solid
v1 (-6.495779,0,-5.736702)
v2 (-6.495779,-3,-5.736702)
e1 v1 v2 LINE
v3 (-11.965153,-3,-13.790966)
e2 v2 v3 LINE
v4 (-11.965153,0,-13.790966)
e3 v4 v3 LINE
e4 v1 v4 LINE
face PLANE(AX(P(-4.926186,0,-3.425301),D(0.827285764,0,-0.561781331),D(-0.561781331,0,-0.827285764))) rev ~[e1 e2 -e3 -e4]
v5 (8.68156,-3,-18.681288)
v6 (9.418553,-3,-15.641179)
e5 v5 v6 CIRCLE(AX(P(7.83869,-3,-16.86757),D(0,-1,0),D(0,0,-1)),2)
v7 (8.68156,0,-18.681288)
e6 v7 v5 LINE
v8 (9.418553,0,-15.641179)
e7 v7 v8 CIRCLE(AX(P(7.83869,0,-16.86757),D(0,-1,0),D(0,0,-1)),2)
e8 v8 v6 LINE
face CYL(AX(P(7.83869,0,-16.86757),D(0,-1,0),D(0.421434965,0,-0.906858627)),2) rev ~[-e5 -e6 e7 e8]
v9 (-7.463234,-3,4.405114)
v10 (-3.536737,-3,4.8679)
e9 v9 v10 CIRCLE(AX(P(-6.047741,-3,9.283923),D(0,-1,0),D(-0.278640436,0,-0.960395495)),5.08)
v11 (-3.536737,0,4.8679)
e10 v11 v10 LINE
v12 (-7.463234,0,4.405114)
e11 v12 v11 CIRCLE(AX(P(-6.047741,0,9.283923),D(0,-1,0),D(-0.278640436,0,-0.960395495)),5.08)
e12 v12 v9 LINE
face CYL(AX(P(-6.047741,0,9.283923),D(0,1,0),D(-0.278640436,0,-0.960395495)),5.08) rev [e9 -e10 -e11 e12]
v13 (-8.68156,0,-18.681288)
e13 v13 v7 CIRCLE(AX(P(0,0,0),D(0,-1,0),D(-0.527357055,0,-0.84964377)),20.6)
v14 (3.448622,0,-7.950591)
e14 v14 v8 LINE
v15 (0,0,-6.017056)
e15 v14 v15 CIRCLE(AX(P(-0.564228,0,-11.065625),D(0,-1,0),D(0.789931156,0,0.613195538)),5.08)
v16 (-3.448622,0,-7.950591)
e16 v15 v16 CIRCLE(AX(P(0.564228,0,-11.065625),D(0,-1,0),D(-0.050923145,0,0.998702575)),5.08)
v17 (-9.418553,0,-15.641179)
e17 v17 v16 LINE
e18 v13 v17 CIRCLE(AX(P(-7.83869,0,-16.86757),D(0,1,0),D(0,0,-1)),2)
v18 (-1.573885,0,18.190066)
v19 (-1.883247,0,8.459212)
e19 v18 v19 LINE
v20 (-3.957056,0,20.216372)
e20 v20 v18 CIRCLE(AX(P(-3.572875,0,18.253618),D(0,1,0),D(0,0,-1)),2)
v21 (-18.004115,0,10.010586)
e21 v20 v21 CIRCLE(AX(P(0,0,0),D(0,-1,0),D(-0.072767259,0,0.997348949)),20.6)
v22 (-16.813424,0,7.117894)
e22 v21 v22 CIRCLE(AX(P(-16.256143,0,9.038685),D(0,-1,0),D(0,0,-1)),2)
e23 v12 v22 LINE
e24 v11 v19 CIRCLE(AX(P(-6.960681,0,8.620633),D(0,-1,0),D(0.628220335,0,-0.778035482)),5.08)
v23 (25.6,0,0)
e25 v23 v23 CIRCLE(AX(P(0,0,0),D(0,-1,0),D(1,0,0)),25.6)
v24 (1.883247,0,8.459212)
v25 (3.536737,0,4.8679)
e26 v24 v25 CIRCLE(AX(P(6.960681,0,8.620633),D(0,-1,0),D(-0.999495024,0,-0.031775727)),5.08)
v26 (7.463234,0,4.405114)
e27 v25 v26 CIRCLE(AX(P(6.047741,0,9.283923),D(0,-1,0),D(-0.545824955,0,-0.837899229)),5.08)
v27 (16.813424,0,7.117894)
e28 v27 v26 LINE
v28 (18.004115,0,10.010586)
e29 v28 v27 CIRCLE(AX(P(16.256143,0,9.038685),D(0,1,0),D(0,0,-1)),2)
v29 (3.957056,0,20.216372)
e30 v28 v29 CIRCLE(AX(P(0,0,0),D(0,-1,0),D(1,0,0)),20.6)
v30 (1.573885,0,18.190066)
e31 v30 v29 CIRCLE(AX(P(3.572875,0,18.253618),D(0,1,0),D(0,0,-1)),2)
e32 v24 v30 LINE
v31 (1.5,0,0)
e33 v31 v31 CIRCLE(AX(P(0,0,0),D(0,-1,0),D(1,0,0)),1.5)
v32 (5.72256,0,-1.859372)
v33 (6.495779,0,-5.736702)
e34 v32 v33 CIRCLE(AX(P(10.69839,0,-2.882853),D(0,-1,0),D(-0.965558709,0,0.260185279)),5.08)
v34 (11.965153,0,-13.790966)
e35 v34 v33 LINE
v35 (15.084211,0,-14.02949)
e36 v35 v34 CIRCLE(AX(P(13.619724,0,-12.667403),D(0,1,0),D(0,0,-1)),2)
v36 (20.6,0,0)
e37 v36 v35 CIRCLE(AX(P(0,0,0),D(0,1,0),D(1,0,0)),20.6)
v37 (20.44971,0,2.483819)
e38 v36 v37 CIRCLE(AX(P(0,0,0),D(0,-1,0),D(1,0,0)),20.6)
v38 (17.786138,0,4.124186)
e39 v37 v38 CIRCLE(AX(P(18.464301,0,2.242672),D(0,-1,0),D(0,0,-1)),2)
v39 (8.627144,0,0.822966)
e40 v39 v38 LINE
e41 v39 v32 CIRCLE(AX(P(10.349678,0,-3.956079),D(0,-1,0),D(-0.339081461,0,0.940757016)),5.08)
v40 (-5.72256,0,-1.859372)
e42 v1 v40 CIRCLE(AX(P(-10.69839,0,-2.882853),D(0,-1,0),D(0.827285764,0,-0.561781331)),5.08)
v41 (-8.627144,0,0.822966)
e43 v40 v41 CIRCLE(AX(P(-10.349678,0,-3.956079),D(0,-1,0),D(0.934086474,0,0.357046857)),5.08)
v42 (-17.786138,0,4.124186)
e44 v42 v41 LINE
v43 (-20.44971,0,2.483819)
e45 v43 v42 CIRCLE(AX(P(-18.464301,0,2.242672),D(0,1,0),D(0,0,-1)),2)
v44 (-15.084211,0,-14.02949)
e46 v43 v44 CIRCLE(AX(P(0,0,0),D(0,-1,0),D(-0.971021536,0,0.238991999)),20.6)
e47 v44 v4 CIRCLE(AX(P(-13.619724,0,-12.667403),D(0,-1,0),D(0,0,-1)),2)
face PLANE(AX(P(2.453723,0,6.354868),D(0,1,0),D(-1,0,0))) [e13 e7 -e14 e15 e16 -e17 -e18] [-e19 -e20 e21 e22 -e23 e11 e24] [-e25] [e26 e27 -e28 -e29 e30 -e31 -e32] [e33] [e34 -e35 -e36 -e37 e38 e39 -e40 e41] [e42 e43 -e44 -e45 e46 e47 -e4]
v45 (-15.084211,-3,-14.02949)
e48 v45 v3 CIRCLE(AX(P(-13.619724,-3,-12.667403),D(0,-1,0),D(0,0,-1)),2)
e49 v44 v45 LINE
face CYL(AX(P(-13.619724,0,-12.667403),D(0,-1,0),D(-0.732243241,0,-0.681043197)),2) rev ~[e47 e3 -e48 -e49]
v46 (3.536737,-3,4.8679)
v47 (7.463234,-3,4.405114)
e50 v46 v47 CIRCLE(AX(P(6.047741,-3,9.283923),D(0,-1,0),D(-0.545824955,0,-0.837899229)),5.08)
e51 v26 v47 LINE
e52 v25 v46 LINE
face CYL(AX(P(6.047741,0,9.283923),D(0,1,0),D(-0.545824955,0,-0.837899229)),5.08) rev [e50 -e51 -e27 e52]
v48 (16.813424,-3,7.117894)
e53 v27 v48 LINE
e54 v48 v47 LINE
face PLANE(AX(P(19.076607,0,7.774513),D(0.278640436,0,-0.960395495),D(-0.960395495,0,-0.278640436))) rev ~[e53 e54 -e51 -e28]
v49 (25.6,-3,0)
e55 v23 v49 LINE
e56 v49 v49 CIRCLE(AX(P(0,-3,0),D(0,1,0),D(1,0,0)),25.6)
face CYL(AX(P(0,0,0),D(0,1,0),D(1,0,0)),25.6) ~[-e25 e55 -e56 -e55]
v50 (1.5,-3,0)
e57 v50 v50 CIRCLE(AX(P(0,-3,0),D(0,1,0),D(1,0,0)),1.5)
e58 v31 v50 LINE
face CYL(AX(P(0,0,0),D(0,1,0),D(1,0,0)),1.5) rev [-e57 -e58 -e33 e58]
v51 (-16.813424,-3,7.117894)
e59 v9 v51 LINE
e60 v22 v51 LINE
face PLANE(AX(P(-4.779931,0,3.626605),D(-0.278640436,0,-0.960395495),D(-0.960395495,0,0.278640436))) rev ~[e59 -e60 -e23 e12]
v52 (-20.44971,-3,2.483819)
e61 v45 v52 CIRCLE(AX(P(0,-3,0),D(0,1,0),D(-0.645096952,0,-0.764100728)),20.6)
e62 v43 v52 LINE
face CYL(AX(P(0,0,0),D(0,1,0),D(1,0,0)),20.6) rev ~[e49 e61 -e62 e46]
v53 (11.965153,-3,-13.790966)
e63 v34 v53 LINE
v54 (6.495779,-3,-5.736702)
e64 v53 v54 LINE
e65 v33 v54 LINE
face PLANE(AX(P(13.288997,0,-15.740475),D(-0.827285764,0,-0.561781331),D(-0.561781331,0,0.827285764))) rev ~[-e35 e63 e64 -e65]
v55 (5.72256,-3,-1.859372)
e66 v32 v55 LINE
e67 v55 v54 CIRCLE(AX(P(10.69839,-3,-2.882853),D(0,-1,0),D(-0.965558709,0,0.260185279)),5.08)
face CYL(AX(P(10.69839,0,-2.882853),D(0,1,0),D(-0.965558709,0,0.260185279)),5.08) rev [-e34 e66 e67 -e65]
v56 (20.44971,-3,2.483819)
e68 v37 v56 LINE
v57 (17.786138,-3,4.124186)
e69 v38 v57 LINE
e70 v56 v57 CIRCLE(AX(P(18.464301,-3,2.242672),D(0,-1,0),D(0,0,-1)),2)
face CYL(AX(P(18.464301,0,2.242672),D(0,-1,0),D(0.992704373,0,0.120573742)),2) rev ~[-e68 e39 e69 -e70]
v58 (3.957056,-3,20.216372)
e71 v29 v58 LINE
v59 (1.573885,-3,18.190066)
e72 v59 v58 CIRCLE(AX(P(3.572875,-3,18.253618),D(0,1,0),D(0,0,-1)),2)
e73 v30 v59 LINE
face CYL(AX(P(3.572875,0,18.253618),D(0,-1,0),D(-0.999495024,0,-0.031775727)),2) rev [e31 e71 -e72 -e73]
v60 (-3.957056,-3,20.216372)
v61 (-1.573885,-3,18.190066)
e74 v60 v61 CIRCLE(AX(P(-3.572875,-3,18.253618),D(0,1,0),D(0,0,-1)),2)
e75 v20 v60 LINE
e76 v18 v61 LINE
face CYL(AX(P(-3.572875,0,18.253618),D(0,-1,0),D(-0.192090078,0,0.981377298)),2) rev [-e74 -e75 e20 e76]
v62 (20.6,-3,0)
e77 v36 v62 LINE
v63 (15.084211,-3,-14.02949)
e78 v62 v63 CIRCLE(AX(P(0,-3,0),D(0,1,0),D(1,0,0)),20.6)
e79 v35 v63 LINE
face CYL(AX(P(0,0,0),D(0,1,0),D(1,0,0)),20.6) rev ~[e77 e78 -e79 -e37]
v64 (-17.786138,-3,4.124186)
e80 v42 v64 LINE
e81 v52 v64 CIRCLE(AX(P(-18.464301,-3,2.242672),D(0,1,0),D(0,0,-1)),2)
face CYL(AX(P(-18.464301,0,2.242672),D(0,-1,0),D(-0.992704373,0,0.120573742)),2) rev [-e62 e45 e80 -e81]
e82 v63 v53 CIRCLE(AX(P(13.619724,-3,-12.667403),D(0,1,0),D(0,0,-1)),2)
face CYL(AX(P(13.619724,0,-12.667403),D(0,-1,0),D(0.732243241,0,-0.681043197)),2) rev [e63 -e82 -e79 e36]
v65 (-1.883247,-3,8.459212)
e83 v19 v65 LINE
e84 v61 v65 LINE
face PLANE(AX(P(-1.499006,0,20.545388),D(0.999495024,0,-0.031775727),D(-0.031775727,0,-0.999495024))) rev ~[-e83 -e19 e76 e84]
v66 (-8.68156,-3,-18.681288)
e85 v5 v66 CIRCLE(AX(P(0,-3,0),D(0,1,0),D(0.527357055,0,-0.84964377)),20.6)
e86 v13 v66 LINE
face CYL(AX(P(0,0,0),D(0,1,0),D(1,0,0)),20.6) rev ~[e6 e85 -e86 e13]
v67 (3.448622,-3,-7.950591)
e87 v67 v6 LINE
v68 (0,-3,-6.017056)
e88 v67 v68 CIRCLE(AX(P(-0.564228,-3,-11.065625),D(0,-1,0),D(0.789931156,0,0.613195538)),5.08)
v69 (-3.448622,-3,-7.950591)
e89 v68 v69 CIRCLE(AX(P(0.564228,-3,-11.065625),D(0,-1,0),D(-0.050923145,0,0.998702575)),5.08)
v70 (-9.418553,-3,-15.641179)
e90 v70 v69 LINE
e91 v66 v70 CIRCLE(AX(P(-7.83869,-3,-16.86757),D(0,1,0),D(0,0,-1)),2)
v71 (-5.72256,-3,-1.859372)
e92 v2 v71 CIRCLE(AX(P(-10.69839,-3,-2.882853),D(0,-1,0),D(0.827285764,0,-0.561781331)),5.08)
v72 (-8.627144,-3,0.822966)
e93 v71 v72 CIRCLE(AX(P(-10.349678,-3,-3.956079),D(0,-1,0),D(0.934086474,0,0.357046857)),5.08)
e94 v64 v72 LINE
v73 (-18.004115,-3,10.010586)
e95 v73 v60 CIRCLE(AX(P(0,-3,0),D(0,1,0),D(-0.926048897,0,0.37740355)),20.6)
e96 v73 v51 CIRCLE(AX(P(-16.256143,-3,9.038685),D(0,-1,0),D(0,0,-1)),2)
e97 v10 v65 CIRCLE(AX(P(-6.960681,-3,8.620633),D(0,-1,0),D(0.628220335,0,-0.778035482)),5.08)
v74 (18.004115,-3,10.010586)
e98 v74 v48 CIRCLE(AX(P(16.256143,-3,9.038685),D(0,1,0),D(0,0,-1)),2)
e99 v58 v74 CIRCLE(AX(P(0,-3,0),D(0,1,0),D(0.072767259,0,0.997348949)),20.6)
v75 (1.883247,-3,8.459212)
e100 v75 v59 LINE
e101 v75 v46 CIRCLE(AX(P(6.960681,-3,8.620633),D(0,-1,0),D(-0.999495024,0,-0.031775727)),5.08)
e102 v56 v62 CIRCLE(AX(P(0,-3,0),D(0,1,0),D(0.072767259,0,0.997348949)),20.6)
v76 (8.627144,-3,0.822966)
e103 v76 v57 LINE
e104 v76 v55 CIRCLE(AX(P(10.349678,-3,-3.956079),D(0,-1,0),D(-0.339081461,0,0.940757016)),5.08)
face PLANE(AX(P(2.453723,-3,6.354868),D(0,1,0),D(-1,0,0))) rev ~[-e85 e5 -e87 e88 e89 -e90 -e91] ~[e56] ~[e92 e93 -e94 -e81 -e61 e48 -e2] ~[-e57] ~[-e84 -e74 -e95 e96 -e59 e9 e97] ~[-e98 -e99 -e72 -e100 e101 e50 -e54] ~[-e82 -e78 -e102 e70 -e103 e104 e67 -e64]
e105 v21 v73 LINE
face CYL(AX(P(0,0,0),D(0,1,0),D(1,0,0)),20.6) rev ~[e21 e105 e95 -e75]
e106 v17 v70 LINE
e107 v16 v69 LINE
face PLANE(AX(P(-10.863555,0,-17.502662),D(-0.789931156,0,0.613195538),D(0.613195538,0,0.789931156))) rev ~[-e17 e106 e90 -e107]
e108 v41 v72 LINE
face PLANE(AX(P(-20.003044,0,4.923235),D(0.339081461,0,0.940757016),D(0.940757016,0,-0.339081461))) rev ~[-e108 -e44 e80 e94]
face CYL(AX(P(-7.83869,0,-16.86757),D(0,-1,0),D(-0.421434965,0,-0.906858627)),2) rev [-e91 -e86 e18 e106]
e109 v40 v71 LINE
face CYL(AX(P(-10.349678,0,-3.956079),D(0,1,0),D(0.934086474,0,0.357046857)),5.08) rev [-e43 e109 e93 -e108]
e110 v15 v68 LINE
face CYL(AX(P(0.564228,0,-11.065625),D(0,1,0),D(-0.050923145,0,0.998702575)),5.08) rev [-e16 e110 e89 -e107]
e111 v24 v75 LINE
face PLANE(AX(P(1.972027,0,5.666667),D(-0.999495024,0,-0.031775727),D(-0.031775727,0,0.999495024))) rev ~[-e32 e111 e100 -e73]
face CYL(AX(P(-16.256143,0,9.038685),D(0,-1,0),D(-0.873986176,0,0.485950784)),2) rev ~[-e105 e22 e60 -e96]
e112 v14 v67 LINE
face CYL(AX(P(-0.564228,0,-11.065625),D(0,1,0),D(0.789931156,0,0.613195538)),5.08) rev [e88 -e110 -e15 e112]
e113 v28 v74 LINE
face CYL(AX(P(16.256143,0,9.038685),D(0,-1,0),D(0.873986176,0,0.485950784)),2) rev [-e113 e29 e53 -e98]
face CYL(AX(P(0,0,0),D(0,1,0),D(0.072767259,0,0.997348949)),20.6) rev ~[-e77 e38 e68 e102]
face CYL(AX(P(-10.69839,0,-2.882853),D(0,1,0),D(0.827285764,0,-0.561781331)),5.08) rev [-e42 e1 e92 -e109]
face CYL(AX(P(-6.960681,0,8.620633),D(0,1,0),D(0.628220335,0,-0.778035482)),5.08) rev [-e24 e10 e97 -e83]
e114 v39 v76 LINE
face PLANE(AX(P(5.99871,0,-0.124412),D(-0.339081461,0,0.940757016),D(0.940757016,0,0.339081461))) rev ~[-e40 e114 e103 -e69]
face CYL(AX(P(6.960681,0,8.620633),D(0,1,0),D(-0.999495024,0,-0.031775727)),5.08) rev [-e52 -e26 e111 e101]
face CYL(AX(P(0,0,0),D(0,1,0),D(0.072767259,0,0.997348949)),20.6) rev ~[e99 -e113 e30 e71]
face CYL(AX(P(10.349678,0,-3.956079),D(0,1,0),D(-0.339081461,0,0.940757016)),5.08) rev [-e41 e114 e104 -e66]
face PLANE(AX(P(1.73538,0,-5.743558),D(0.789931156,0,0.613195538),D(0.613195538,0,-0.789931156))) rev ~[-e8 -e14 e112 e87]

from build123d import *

# Parameters (mm, degrees)
F0_R        = 25.6
F0_R_2      = 1.5
F1_DEPTH    = 3
F2_COUNT    = 5
F3_T1_DEPTH = 3
F4_R        = 2


# Not quite as in the source:
# - a fillet or chamfer that OpenCascade refuses, or shapes differently, is made with other operations: its cross-section is extruded or revolved along the edge and cut away or added


with BuildPart() as f1:
    # F0 (on Front) → F1 (new body)
    with BuildSketch(Plane.XZ):
        Circle(F0_R)
        with BuildLine():
            ThreePointArc((-1.4990055262, 20.5453883495), (0, 20.6), (1.4990055262, 20.5453883495))
            ThreePointArc((1.4990055262, 20.5453883495), (15.0870725099, 14.0264123382), (20.6, 0))
            ThreePointArc((20.6, 0), (-14.0264123382, -15.0870725099), (-1.4990055262, 20.5453883495))
        make_face(mode=Mode.SUBTRACT)
        with BuildLine():
            ThreePointArc((-1.9720265944, 5.6666666667), (-3.4761933515, -4.8904069139), (6, 0))
            ThreePointArc((6, 0), (4.8904069139, 3.4761933515), (1.9720265944, 5.6666666667))
            ThreePointArc((1.9720265944, 5.6666666667), (0, 6), (-1.9720265944, 5.6666666667))
        make_face()
        Circle(F0_R_2, mode=Mode.SUBTRACT)
        with BuildLine():
            ThreePointArc((-1.9720265944, 5.6666666667), (0, 6), (1.9720265944, 5.6666666667))
            Line((1.9720265944, 5.6666666667), (1.4990055262, 20.5453883495))
            ThreePointArc((1.4990055262, 20.5453883495), (0, 20.6), (-1.4990055262, 20.5453883495))
            Line((-1.4990055262, 20.5453883495), (-1.9720265944, 5.6666666667))
        make_face()
    extrude(amount=F1_DEPTH)

    # F2: F1 ×5 about axis
    f2_axis = Axis((0, 0, 0), (0, -1, 0))


with BuildPart() as f1_1:
    add(f1.part)
    for i in range(1, F2_COUNT):
        add(f1.part.rotate(f2_axis, i * 360 / F2_COUNT))

    # F3: fillet of radius 5.08 on 10 edges, made by hand

    # F3_s2 → F3_t1 (join)
    with BuildSketch(Plane.XZ):
        with BuildLine():
            ThreePointArc((1.8832465894, 8.4592124416), (2.4124774845, 6.3578379743), (3.7693220099, 4.6682128899))
            ThreePointArc((3.7693220099, 4.6682128899), (2.9137601883, 5.244997766), (1.9720265944, 5.6666666667))
            Line((1.9720265944, 5.6666666667), (1.8832465894, 8.4592124416))
        make_face()
        with BuildLine():
            ThreePointArc((3.2749497301, 5.0273953759), (5.3011666938, 4.2590824136), (7.4632339146, 4.4051143441))
            Line((7.4632339146, 4.4051143441), (4.779930528, 3.6266050443))
            ThreePointArc((4.779930528, 3.6266050443), (4.0878878875, 4.3919440592), (3.2749497301, 5.0273953759))
        make_face()
        with BuildLine():
            ThreePointArc((5.7933522546, -1.5611116727), (5.6887786813, -3.7255802818), (6.4957788146, -5.7367020526))
            Line((6.4957788146, -5.7367020526), (4.9261861245, -3.4253014855))
            ThreePointArc((4.9261861245, -3.4253014855), (5.440213845, -2.5306270607), (5.7933522546, -1.5611116727))
        make_face()
        with BuildLine():
            ThreePointArc((-3.7693220099, 4.6682128899), (-2.4124774845, 6.3578379743), (-1.8832465894, 8.4592124416))
            Line((-1.8832465894, 8.4592124416), (-1.9720265944, 5.6666666667))
            ThreePointArc((-1.9720265944, 5.6666666667), (-2.9137601883, 5.244997766), (-3.7693220099, 4.6682128899))
        make_face()
        with BuildLine():
            ThreePointArc((-7.4632339146, 4.4051143441), (-5.3011666938, 4.2590824136), (-3.2749497301, 5.0273953759))
            ThreePointArc((-3.2749497301, 5.0273953759), (-4.0878878875, 4.3919440592), (-4.779930528, 3.6266050443))
            Line((-4.779930528, 3.6266050443), (-7.4632339146, 4.4051143441))
        make_face()
        with BuildLine():
            ThreePointArc((-5.6045188467, -2.1422811432), (-6.7921597763, -0.3297224505), (-8.627144316, 0.8229664629))
            Line((-8.627144316, 0.8229664629), (-5.99870999, -0.1244124414))
            ThreePointArc((-5.99870999, -0.1244124414), (-5.888690719, -1.1503571689), (-5.6045188467, -2.1422811432))
        make_face()
        with BuildLine():
            ThreePointArc((-6.4957788146, -5.7367020526), (-5.6887786813, -3.7255802818), (-5.7933522546, -1.5611116727))
            ThreePointArc((-5.7933522546, -1.5611116727), (-5.440213845, -2.5306270607), (-4.9261861245, -3.4253014855))
            Line((-4.9261861245, -3.4253014855), (-6.4957788146, -5.7367020526))
        make_face()
        with BuildLine():
            ThreePointArc((0.3055388721, -5.9922154499), (-1.7853081143, -6.5616176556), (-3.4486218238, -7.950591196))
            Line((-3.4486218238, -7.950591196), (-1.7353800681, -5.7435577841))
            ThreePointArc((-1.7353800681, -5.7435577841), (-0.7256508252, -5.9559575955), (0.3055388721, -5.9922154499))
        make_face()
        with BuildLine():
            ThreePointArc((3.4486218238, -7.950591196), (1.7853081143, -6.5616176556), (-0.3055388721, -5.9922154499))
            ThreePointArc((-0.3055388721, -5.9922154499), (0.7256508252, -5.9559575955), (1.7353800681, -5.7435577841))
            Line((1.7353800681, -5.7435577841), (3.4486218238, -7.950591196))
        make_face()
        with BuildLine():
            ThreePointArc((8.627144316, 0.8229664629), (6.7921597763, -0.3297224505), (5.6045188467, -2.1422811432))
            ThreePointArc((5.6045188467, -2.1422811432), (5.888690719, -1.1503571689), (5.99870999, -0.1244124414))
            Line((5.99870999, -0.1244124414), (8.627144316, 0.8229664629))
        make_face()
    extrude(amount=F3_T1_DEPTH)

    # F4
    f4_edges = [f1_1.edges().sort_by_distance(p)[0] for p in [
        (1.499006, -1.5, 20.545388),
        (-20.003044, -1.5, 4.923235),
        (20.003044, -1.5, 4.923235),
        (10.863555, -1.5, -17.502662),
        (-1.499006, -1.5, 20.545388),
        (19.076607, -1.5, 7.774513),
        (13.288997, -1.5, -15.740475),
        (-19.076607, -1.5, 7.774513),
        (-10.863555, -1.5, -17.502662),
        (-13.288997, -1.5, -15.740475),
    ]]
    fillet(f4_edges, radius=F4_R)


solid = f1_1.part
